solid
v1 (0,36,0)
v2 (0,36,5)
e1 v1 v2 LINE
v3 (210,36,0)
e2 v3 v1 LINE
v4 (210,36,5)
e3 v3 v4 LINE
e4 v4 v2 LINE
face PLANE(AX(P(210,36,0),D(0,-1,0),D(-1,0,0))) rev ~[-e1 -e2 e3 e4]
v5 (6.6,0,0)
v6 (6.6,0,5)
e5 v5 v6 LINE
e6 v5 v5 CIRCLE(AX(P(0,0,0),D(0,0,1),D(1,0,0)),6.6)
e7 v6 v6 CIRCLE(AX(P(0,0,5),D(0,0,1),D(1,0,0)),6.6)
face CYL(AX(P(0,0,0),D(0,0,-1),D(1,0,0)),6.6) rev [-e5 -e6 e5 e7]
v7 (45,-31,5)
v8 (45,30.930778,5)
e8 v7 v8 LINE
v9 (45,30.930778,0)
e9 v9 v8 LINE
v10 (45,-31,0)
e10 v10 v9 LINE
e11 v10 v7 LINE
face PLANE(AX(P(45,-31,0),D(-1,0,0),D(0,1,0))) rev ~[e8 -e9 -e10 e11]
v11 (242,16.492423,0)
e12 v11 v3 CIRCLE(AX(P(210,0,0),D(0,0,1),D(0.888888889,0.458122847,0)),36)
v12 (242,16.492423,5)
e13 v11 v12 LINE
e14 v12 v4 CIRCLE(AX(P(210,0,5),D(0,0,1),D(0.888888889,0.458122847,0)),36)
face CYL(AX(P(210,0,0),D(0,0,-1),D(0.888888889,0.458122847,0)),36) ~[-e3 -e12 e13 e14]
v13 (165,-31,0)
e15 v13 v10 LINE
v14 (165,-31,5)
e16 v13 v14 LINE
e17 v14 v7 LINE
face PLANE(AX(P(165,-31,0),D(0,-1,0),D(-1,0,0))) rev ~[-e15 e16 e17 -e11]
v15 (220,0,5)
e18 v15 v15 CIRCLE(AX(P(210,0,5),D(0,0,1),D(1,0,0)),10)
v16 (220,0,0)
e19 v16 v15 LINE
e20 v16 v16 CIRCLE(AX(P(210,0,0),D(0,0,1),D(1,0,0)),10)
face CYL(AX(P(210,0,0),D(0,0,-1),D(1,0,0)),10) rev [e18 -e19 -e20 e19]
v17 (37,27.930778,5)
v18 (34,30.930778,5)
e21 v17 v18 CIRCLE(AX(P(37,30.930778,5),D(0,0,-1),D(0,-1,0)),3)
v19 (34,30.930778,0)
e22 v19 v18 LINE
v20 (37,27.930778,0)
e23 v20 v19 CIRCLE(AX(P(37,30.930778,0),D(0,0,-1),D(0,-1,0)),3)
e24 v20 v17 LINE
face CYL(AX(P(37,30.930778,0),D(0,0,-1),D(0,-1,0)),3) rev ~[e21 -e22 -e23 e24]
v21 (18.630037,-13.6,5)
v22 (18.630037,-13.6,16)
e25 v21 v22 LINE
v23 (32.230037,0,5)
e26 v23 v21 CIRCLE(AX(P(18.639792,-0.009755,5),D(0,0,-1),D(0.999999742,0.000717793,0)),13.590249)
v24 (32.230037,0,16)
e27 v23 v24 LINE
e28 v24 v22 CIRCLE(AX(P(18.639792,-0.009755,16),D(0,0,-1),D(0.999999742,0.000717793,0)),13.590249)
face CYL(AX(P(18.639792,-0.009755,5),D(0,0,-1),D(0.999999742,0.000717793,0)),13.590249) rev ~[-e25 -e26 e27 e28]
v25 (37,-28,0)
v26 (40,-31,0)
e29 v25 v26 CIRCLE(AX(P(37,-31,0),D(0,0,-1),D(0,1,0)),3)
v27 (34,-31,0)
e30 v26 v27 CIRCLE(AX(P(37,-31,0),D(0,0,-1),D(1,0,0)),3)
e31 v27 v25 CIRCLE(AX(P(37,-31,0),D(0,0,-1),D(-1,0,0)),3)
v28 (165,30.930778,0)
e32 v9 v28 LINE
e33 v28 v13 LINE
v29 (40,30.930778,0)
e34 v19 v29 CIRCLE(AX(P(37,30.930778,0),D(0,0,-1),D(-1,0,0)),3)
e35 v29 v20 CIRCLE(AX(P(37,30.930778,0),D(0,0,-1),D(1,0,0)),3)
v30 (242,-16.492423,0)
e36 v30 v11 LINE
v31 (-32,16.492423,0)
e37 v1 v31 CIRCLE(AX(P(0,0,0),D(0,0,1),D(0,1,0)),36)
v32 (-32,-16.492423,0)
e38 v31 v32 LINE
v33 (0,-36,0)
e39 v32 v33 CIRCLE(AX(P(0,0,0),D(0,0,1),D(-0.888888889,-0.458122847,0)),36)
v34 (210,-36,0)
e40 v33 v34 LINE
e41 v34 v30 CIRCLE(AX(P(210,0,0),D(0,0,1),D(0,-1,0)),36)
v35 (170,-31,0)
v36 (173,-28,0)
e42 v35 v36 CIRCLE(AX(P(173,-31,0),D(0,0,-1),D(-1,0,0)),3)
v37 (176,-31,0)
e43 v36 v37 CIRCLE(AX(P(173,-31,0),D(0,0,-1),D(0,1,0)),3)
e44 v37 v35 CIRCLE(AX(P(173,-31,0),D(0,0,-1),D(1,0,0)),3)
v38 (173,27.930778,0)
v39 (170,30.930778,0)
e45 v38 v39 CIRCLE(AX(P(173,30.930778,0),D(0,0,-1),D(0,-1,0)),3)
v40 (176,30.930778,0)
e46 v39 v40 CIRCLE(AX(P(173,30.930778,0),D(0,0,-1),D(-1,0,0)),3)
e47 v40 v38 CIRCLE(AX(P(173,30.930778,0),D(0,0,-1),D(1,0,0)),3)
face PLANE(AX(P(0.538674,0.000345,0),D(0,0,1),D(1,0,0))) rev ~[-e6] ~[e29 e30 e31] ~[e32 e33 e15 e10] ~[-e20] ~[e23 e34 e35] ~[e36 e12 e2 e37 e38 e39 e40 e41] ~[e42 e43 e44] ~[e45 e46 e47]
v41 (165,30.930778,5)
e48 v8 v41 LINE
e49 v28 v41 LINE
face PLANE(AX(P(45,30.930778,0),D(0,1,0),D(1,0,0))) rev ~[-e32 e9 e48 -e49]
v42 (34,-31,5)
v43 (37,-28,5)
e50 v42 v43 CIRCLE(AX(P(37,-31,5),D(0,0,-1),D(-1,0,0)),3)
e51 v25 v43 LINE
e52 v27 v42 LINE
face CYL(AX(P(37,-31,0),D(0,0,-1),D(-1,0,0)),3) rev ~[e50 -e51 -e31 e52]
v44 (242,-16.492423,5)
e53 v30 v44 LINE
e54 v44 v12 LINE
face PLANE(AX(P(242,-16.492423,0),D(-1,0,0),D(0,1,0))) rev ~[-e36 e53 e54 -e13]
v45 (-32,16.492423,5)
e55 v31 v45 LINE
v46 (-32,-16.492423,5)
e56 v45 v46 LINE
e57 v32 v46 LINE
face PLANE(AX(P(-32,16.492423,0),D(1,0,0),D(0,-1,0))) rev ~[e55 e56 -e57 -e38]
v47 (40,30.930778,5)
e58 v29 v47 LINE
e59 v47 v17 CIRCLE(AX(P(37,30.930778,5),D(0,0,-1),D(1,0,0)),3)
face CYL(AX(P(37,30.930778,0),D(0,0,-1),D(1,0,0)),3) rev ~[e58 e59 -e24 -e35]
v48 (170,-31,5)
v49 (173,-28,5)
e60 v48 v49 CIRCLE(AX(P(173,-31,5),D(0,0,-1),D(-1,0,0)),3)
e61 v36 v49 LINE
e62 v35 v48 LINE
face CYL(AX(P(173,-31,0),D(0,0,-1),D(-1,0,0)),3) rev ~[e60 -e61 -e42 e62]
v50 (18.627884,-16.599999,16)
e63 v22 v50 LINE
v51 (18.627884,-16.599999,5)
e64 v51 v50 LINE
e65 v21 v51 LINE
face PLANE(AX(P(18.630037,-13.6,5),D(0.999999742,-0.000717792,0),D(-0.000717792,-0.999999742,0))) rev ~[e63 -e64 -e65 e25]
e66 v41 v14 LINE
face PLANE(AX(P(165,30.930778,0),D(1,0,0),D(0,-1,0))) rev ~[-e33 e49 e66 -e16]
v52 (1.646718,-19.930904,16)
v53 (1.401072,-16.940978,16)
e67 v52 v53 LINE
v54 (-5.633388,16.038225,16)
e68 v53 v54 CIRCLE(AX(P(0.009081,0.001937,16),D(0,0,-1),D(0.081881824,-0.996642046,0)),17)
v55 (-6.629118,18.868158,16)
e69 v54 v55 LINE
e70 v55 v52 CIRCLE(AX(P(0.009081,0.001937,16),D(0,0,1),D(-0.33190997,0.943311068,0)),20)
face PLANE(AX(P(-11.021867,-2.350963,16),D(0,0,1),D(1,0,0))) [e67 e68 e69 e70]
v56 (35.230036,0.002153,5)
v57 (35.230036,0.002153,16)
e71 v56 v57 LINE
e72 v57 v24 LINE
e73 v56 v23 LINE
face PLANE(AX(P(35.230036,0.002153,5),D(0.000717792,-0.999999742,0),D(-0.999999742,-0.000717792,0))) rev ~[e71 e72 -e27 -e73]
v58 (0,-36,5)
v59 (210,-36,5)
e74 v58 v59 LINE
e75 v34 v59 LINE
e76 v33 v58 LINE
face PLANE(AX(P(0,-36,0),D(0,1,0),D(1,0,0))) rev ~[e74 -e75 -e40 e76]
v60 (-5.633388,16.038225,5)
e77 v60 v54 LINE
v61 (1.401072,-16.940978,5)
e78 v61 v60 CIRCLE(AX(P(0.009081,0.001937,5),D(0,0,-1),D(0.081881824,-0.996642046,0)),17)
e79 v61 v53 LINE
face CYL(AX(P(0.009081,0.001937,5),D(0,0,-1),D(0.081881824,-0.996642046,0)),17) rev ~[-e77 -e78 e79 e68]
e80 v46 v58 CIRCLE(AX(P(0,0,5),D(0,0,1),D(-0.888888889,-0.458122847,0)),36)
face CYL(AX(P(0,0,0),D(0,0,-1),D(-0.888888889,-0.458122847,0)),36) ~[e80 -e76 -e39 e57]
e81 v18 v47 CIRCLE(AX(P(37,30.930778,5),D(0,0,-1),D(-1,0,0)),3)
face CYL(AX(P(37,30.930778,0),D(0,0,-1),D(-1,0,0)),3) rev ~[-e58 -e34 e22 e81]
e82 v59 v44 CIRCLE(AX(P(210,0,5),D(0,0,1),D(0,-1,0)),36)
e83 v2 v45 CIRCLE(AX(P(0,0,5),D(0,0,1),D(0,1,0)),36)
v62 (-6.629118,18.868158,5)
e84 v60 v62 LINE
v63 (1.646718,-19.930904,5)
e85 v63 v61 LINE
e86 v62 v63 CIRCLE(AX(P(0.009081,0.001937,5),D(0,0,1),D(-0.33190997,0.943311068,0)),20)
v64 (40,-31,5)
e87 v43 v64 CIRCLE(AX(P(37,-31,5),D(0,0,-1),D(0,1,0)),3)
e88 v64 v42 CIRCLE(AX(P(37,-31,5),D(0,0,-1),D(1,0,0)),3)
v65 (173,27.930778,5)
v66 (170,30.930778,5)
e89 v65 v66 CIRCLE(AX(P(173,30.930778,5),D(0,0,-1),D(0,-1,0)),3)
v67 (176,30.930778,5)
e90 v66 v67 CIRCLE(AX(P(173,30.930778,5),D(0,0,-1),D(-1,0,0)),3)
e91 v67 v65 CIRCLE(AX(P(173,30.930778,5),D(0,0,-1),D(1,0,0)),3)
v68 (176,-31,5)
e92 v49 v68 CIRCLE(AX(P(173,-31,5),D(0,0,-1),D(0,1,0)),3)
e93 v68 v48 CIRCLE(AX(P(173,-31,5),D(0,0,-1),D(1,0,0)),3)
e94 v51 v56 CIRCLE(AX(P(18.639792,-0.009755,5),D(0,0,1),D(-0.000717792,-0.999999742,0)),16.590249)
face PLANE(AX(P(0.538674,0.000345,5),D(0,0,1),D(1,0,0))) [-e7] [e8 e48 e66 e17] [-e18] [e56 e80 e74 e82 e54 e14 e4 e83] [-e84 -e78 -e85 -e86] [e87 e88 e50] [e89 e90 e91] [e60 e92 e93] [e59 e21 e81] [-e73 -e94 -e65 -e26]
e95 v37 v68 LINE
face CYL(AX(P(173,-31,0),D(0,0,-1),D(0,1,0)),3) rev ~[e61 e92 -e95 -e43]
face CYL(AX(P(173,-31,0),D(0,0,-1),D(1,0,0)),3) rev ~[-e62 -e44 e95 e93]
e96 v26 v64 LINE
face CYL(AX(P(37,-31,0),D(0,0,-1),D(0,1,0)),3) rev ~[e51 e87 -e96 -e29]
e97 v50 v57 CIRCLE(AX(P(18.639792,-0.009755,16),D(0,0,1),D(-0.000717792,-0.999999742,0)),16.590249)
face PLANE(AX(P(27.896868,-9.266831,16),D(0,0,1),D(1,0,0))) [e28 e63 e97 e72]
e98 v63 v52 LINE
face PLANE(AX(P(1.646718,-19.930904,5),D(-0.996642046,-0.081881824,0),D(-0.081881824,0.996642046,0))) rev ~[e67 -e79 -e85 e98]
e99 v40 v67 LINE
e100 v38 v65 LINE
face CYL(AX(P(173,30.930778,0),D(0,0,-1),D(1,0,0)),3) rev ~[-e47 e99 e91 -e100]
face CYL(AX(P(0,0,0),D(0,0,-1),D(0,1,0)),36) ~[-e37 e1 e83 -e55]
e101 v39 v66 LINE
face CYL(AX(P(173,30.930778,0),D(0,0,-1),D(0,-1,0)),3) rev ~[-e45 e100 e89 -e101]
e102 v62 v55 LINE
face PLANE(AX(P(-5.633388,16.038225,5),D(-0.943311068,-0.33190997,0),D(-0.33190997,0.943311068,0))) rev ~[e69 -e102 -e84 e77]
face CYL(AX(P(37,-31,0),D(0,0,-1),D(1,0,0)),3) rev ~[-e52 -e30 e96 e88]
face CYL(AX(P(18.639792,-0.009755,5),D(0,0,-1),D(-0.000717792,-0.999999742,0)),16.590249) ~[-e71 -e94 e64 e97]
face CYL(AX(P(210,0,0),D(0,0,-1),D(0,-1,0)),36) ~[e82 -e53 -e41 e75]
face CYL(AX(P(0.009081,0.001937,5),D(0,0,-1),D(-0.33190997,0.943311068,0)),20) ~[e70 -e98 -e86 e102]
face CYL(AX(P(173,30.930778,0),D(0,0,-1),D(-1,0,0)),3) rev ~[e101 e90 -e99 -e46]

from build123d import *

# Parameters (mm, degrees)
F0_R     = 30
F0_R_2   = 10
F0_R_3   = 14
F0_R_4   = 6.6
F1_DEPTH = 5
F3_DEPTH = 11


with BuildPart() as f1:
    # F0 (on Top) → F1 (new body)
    with BuildSketch(Plane.XY):
        with BuildLine():
            ThreePointArc((18.3030052177, -31), (31.2642622481, -17.8478543831), (36, 0))
            ThreePointArc((36, 0), (31.2978497092, 17.7888898917), (18.4197442455, 30.9307779069))
            ThreePointArc((18.4197442455, 30.9307779069), (9.5522770937, 34.7095664382), (0, 36))
            ThreePointArc((0, 36), (-18.7386337537, 30.7386337537), (-32, 16.4924225025))
            Line((-32, 16.4924225025), (-32, -16.4924225025))
            ThreePointArc((-32, -16.4924225025), (-18.7386337537, -30.7386337537), (0, -36))
            ThreePointArc((0, -36), (9.4868329805, -34.7275107084), (18.3030052177, -31))
        make_face()
        Circle(F0_R, mode=Mode.SUBTRACT)
        with BuildLine():
            ThreePointArc((242, 16.4924225025), (228.7386337537, 30.7386337537), (210, 36))
            ThreePointArc((210, 36), (200.4477229063, 34.7095664382), (191.5802557545, 30.9307779069))
            ThreePointArc((191.5802557545, 30.9307779069), (174.0000639573, -0.0678595955), (191.6969947823, -31))
            ThreePointArc((191.6969947823, -31), (200.5131670195, -34.7275107084), (210, -36))
            ThreePointArc((210, -36), (228.7386337537, -30.7386337537), (242, -16.4924225025))
            Line((242, -16.4924225025), (242, 16.4924225025))
        make_face()
        with Locations((210, 0)):
            Circle(F0_R, mode=Mode.SUBTRACT)
        Circle(F0_R)
        Circle(F0_R_2, mode=Mode.SUBTRACT)
        with Locations((210, 0)):
            Circle(F0_R)
        with Locations((210, 0)):
            Circle(F0_R_3, mode=Mode.SUBTRACT)
        with BuildLine():
            ThreePointArc((19.6214168703, 36), (23.4046464655, 33.6633706545), (26.9125802938, 30.9307779069))
            Line((26.9125802938, 30.9307779069), (34, 30.9307779069))
            ThreePointArc((34, 30.9307779069), (37, 33.9307779069), (40, 30.9307779069))
            Line((40, 30.9307779069), (45, 30.9307779069))
            Line((45, 30.9307779069), (165, 30.9307779069))
            Line((165, 30.9307779069), (170, 30.9307779069))
            ThreePointArc((170, 30.9307779069), (173, 33.9307779069), (176, 30.9307779069))
            Line((176, 30.9307779069), (183.0874197062, 30.9307779069))
            ThreePointArc((183.0874197062, 30.9307779069), (186.5953535345, 33.6633706545), (190.3785831296, 36))
            Line((190.3785831296, 36), (19.6214168703, 36))
        make_face()
        with BuildLine():
            Line((34, -31), (26.83281573, -31))
            ThreePointArc((26.83281573, -31), (23.361269906, -33.693487032), (19.6214168703, -36))
            Line((19.6214168703, -36), (190.3785831296, -36))
            ThreePointArc((190.3785831296, -36), (186.638730094, -33.693487032), (183.16718427, -31))
            Line((183.16718427, -31), (176, -31))
            ThreePointArc((176, -31), (173, -34), (170, -31))
            Line((170, -31), (165, -31))
            Line((165, -31), (45, -31))
            Line((45, -31), (40, -31))
            ThreePointArc((40, -31), (37, -34), (34, -31))
        make_face()
        with Locations((210, 0)):
            Circle(F0_R_3)
        with Locations((210, 0)):
            Circle(F0_R_2, mode=Mode.SUBTRACT)
        with BuildLine():
            Line((37, 27.9307779069), (37, 17.6635217327))
            ThreePointArc((37, 17.6635217327), (39.9874980463, 9.0553851381), (41, 0))
            ThreePointArc((41, 0), (39.9874980463, -9.0553851381), (37, -17.6635217327))
            Line((37, -17.6635217327), (37, -28))
            ThreePointArc((37, -28), (39.1213203436, -28.8786796564), (40, -31))
            Line((40, -31), (45, -31))
            Line((45, -31), (45, 30.9307779069))
            Line((45, 30.9307779069), (40, 30.9307779069))
            ThreePointArc((40, 30.9307779069), (39.1213203436, 28.8094575634), (37, 27.9307779069))
        make_face()
        with BuildLine():
            ThreePointArc((173, -17.6635217327), (169, 0), (173, 17.6635217327))
            Line((173, 17.6635217327), (173, 27.9307779069))
            ThreePointArc((173, 27.9307779069), (170.8786796564, 28.8094575634), (170, 30.9307779069))
            Line((170, 30.9307779069), (165, 30.9307779069))
            Line((165, 30.9307779069), (165, -31))
            Line((165, -31), (170, -31))
            ThreePointArc((170, -31), (170.8786796564, -28.8786796564), (173, -28))
            Line((173, -28), (173, -17.6635217327))
        make_face()
        Circle(F0_R_2)
        Circle(F0_R_4, mode=Mode.SUBTRACT)
        with BuildLine():
            ThreePointArc((18.4197442455, 30.9307779069), (31.2978497092, 17.7888898917), (36, 0))
            ThreePointArc((36, 0), (31.2642622481, -17.8478543831), (18.3030052177, -31))
            Line((18.3030052177, -31), (26.83281573, -31))
            ThreePointArc((26.83281573, -31), (32.6055594055, -24.8571417474), (37, -17.6635217327))
            Line((37, -17.6635217327), (37, 17.6635217327))
            ThreePointArc((37, 17.6635217327), (32.6375474194, 24.815126404), (26.9125802938, 30.9307779069))
            Line((26.9125802938, 30.9307779069), (18.4197442455, 30.9307779069))
        make_face()
        with BuildLine():
            Line((191.5802557545, 30.9307779069), (183.0874197062, 30.9307779069))
            ThreePointArc((183.0874197062, 30.9307779069), (177.3624525806, 24.815126404), (173, 17.6635217327))
            Line((173, 17.6635217327), (173, -17.6635217327))
            ThreePointArc((173, -17.6635217327), (177.3944405945, -24.8571417474), (183.16718427, -31))
            Line((183.16718427, -31), (191.6969947823, -31))
            ThreePointArc((191.6969947823, -31), (174.0000639573, -0.0678595955), (191.5802557545, 30.9307779069))
        make_face()
        with BuildLine():
            ThreePointArc((41, 0), (39.9874980463, 9.0553851381), (37, 17.6635217327))
            Line((37, 17.6635217327), (37, -17.6635217327))
            ThreePointArc((37, -17.6635217327), (39.9874980463, -9.0553851381), (41, 0))
        make_face()
        with BuildLine():
            Line((173, -17.6635217327), (173, 17.6635217327))
            ThreePointArc((173, 17.6635217327), (169, 0), (173, -17.6635217327))
        make_face()
        with BuildLine():
            ThreePointArc((0, 36), (9.5522770937, 34.7095664382), (18.4197442455, 30.9307779069))
            Line((18.4197442455, 30.9307779069), (26.9125802938, 30.9307779069))
            ThreePointArc((26.9125802938, 30.9307779069), (23.4046464655, 33.6633706545), (19.6214168703, 36))
            Line((19.6214168703, 36), (0, 36))
        make_face()
        with BuildLine():
            Line((210, 36), (190.3785831296, 36))
            ThreePointArc((190.3785831296, 36), (186.5953535345, 33.6633706545), (183.0874197062, 30.9307779069))
            Line((183.0874197062, 30.9307779069), (191.5802557545, 30.9307779069))
            ThreePointArc((191.5802557545, 30.9307779069), (200.4477229063, 34.7095664382), (210, 36))
        make_face()
        with BuildLine():
            Line((26.83281573, -31), (18.3030052177, -31))
            ThreePointArc((18.3030052177, -31), (9.4868329805, -34.7275107084), (0, -36))
            Line((0, -36), (19.6214168703, -36))
            ThreePointArc((19.6214168703, -36), (23.361269906, -33.693487032), (26.83281573, -31))
        make_face()
        with BuildLine():
            ThreePointArc((183.16718427, -31), (186.638730094, -33.693487032), (190.3785831296, -36))
            Line((190.3785831296, -36), (210, -36))
            ThreePointArc((210, -36), (200.5131670195, -34.7275107084), (191.6969947823, -31))
            Line((191.6969947823, -31), (183.16718427, -31))
        make_face()
        with BuildLine():
            ThreePointArc((37, -17.6635217327), (32.6055594055, -24.8571417474), (26.83281573, -31))
            Line((26.83281573, -31), (34, -31))
            ThreePointArc((34, -31), (34.8786796564, -28.8786796564), (37, -28))
            Line((37, -28), (37, -17.6635217327))
        make_face()
        with BuildLine():
            Line((176, -31), (183.16718427, -31))
            ThreePointArc((183.16718427, -31), (177.3944405945, -24.8571417474), (173, -17.6635217327))
            Line((173, -17.6635217327), (173, -28))
            ThreePointArc((173, -28), (175.1213203436, -28.8786796564), (176, -31))
        make_face()
        with BuildLine():
            Line((34, 30.9307779069), (26.9125802938, 30.9307779069))
            ThreePointArc((26.9125802938, 30.9307779069), (32.6375474194, 24.815126404), (37, 17.6635217327))
            Line((37, 17.6635217327), (37, 27.9307779069))
            ThreePointArc((37, 27.9307779069), (34.8786796564, 28.8094575634), (34, 30.9307779069))
        make_face()
        with BuildLine():
            ThreePointArc((173, 17.6635217327), (177.3624525806, 24.815126404), (183.0874197062, 30.9307779069))
            Line((183.0874197062, 30.9307779069), (176, 30.9307779069))
            ThreePointArc((176, 30.9307779069), (175.1213203436, 28.8094575634), (173, 27.9307779069))
            Line((173, 27.9307779069), (173, 17.6635217327))
        make_face()
    extrude(amount=F1_DEPTH)

    # F2 (on face) → F3 (join)
    with BuildSketch(Plane.XY.offset(5)):
        with BuildLine():
            ThreePointArc((32.2300370842, 0), (28.249548951, -9.6195118668), (18.6300370842, -13.6))
            Line((18.6300370842, -13.6), (18.6278837067, -16.5999992272))
            ThreePointArc((18.6278837067, -16.5999992272), (30.3708692945, -11.7408322103), (35.2300363114, 0.0021533775))
            Line((35.2300363114, 0.0021533775), (32.2300370842, 0))
        make_face()
        with BuildLine():
            ThreePointArc((1.4010723087, -16.9409777332), (-16.6169103502, -3.544385222), (-5.6333881929, 16.0382252023))
            Line((-5.6333881929, 16.0382252023), (-6.6291181037, 18.8681584073))
            ThreePointArc((-6.6291181037, 18.8681584073), (-19.550908877, -4.1702067977), (1.6467177805, -19.9309038698))
            Line((1.6467177805, -19.9309038698), (1.4010723087, -16.9409777332))
        make_face()
    extrude(amount=F3_DEPTH)


solid = f1.part
